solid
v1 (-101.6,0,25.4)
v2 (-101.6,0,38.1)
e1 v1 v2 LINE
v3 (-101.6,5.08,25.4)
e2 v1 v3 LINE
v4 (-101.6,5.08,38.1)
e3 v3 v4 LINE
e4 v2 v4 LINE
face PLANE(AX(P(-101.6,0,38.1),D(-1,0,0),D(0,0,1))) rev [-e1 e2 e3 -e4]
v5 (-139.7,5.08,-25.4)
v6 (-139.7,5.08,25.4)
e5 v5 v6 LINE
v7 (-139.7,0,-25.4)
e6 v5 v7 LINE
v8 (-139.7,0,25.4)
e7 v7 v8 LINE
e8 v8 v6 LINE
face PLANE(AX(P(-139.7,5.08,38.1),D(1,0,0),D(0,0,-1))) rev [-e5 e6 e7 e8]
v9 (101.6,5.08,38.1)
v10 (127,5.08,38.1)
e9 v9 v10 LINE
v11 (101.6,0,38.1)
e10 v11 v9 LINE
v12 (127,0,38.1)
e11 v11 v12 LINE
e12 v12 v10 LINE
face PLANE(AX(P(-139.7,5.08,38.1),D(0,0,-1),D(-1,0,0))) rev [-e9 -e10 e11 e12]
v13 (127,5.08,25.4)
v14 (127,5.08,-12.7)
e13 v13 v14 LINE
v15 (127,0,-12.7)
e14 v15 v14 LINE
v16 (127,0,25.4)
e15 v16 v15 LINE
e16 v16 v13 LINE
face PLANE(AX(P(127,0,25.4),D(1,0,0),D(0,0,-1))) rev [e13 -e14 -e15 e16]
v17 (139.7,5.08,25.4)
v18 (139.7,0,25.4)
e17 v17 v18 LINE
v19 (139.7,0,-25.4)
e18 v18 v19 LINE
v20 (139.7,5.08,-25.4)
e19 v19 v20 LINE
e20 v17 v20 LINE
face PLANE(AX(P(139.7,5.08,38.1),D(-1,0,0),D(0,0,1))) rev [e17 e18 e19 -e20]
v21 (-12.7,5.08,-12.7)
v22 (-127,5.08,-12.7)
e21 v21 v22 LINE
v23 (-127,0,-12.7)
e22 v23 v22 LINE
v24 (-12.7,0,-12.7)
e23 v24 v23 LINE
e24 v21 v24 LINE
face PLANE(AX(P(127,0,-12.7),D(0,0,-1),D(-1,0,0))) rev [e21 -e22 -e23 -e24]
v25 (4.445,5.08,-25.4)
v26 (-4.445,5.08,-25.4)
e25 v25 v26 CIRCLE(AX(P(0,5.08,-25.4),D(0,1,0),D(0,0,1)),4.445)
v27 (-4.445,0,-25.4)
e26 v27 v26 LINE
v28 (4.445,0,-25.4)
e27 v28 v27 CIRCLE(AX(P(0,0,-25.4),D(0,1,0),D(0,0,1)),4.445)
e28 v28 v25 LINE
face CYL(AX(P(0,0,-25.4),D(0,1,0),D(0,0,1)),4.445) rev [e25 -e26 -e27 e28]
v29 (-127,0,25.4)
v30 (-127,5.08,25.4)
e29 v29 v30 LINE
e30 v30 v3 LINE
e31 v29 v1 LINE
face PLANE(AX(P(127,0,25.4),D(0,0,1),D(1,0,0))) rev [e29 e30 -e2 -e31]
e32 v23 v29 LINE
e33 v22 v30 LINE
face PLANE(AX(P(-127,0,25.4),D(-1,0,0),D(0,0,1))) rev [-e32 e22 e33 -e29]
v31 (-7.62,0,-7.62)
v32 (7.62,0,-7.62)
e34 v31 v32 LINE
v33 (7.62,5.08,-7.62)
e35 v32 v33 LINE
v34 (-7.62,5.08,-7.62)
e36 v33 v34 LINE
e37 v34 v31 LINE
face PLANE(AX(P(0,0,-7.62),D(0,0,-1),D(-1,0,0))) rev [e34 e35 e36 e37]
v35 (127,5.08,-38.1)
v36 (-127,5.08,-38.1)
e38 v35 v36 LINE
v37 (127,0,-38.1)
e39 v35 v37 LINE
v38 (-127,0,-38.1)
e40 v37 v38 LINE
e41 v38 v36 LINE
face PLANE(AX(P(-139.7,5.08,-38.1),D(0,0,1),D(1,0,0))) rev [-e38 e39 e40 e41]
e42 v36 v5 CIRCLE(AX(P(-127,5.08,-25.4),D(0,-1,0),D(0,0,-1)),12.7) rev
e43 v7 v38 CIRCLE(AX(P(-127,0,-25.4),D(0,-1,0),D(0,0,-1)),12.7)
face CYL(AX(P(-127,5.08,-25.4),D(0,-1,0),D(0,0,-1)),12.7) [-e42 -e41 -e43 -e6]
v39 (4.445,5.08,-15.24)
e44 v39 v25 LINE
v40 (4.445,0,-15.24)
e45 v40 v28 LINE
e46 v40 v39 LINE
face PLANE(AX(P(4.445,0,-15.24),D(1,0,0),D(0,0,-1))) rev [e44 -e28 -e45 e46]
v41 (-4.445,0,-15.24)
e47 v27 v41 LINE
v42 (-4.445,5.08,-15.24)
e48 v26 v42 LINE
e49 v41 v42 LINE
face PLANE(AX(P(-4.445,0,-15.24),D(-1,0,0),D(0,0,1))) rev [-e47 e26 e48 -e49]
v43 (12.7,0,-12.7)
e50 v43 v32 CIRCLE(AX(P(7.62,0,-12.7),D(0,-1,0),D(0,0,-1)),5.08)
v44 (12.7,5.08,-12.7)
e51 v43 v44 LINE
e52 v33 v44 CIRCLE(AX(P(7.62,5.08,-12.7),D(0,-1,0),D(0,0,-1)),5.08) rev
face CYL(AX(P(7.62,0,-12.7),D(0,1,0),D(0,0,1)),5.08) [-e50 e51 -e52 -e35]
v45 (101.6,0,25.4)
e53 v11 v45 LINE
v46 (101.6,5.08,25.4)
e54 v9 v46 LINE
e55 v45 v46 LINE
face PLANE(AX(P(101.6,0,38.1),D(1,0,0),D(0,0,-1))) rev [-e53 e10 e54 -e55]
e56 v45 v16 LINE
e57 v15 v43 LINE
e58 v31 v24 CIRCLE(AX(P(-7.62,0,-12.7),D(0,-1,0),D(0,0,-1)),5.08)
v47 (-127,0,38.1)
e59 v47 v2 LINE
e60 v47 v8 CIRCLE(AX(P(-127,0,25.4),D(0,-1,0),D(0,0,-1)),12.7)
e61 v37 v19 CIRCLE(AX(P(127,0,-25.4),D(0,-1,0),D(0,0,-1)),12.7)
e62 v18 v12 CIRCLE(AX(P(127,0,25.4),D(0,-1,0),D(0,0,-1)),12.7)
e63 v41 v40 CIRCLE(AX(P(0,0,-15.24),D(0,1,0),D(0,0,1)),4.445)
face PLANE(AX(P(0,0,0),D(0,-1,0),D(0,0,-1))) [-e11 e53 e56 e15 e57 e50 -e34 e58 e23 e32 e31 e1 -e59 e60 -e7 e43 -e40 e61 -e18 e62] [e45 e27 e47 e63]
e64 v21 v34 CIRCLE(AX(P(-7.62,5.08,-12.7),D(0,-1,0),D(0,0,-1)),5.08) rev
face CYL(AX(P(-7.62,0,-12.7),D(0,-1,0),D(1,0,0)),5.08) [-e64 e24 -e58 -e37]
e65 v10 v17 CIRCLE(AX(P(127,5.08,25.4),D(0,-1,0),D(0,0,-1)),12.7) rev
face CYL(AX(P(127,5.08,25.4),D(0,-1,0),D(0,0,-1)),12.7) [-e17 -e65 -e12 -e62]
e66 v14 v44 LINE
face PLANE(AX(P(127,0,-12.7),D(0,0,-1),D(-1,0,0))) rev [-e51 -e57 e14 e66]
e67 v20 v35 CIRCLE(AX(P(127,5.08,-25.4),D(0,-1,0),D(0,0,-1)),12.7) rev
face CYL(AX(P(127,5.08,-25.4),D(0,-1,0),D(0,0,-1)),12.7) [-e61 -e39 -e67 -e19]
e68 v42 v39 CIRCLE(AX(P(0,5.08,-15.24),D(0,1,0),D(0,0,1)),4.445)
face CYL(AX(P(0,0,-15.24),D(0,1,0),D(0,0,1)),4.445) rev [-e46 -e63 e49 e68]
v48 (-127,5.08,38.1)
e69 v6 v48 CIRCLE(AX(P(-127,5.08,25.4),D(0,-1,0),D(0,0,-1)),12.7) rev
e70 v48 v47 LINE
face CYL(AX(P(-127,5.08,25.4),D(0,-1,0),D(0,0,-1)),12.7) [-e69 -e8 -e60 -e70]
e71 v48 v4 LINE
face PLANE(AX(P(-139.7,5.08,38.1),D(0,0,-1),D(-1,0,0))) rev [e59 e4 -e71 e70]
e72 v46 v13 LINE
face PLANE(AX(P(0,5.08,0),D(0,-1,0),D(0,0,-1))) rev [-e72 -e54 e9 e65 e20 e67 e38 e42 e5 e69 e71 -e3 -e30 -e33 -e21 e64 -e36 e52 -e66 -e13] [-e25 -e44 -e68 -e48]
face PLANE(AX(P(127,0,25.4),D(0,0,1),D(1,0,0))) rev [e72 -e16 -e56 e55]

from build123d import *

# Parameters (mm, degrees)
SKETCH1_W           = 279.4
SKETCH1_H           = 76.2
BOSS_EXTRUDE1_DEPTH = 5.08
SKETCH2_W           = 254
SKETCH2_H           = 38.1
CUT_EXTRUDE1_DEPTH  = 145.891360681
FILLET1_R           = 12.7
FILLET2_R           = 12.7
SKETCH4_W           = 203.2
SKETCH4_H           = 12.7
CUT_EXTRUDE2_DEPTH  = 145.891360681
SKETCH5_W           = 25.4
SKETCH5_H           = 5.08
BOSS_EXTRUDE2_DEPTH = 5.08
FILLET3_R           = 5.08
CUT_EXTRUDE4_DEPTH  = 145.891360681


with BuildPart() as part:
    # Sketch1 → Boss-Extrude1 (new body)
    with BuildSketch(Plane(origin=(0, 0, 0), x_dir=(1, 0, 0), z_dir=(0, 1, 0))):
        Rectangle(SKETCH1_W, SKETCH1_H)
    extrude(amount=BOSS_EXTRUDE1_DEPTH)

    # Sketch2 → Cut-Extrude1 (cut, through all)
    with BuildSketch(Plane(origin=(0, 5.08, 0), x_dir=(1, 0, 0), z_dir=(0, 1, 0))):
        with Locations((0, -6.35)):
            Rectangle(SKETCH2_W, SKETCH2_H)
    extrude(amount=-CUT_EXTRUDE1_DEPTH, mode=Mode.SUBTRACT)

    # Fillet1
    fillet1_edges = [part.edges().sort_by_distance(p)[0] for p in [
        (-139.7, 2.54, -38.1),
        (139.7, 2.54, -38.1),
    ]]
    fillet(fillet1_edges, radius=FILLET1_R)

    # Fillet2
    fillet2_edges = [part.edges().sort_by_distance(p)[0] for p in [
        (139.7, 2.54, 38.1),
        (-139.7, 2.54, 38.1),
    ]]
    fillet(fillet2_edges, radius=FILLET2_R)

    # Sketch4 → Cut-Extrude2 (cut, through all)
    with BuildSketch(Plane(origin=(0, 5.08, 0), x_dir=(1, 0, 0), z_dir=(0, 1, 0))):
        with Locations((0, -31.75)):
            Rectangle(SKETCH4_W, SKETCH4_H)
    extrude(amount=-CUT_EXTRUDE2_DEPTH, mode=Mode.SUBTRACT)

    # Sketch5 → Boss-Extrude2 (add)
    with BuildSketch(Plane.XY.offset(-12.7)):
        with Locations((0, 2.54)):
            Rectangle(SKETCH5_W, SKETCH5_H)
    extrude(amount=BOSS_EXTRUDE2_DEPTH)

    # Fillet3
    fillet3_edges = [part.edges().sort_by_distance(p)[0] for p in [
        (-12.7, 2.54, -7.62),
        (12.7, 2.54, -7.62),
    ]]
    fillet(fillet3_edges, radius=FILLET3_R - 0.0001)  # a hair under: the kernel refuses the full size

    # Sketch6 → Cut-Extrude4 (cut, through all)
    with BuildSketch(Plane(origin=(0, 5.08, 0), x_dir=(1, 0, 0), z_dir=(0, 1, 0))):
        with BuildLine():
            Line((-4.445, 15.24), (-4.445, 25.4))
            ThreePointArc((-4.445, 25.4), (0, 29.845), (4.445, 25.4))
            Line((4.445, 25.4), (4.445, 15.24))
            ThreePointArc((4.445, 15.24), (0, 10.795), (-4.445, 15.24))
        make_face()
    extrude(amount=-CUT_EXTRUDE4_DEPTH, mode=Mode.SUBTRACT)


solid = part.part
